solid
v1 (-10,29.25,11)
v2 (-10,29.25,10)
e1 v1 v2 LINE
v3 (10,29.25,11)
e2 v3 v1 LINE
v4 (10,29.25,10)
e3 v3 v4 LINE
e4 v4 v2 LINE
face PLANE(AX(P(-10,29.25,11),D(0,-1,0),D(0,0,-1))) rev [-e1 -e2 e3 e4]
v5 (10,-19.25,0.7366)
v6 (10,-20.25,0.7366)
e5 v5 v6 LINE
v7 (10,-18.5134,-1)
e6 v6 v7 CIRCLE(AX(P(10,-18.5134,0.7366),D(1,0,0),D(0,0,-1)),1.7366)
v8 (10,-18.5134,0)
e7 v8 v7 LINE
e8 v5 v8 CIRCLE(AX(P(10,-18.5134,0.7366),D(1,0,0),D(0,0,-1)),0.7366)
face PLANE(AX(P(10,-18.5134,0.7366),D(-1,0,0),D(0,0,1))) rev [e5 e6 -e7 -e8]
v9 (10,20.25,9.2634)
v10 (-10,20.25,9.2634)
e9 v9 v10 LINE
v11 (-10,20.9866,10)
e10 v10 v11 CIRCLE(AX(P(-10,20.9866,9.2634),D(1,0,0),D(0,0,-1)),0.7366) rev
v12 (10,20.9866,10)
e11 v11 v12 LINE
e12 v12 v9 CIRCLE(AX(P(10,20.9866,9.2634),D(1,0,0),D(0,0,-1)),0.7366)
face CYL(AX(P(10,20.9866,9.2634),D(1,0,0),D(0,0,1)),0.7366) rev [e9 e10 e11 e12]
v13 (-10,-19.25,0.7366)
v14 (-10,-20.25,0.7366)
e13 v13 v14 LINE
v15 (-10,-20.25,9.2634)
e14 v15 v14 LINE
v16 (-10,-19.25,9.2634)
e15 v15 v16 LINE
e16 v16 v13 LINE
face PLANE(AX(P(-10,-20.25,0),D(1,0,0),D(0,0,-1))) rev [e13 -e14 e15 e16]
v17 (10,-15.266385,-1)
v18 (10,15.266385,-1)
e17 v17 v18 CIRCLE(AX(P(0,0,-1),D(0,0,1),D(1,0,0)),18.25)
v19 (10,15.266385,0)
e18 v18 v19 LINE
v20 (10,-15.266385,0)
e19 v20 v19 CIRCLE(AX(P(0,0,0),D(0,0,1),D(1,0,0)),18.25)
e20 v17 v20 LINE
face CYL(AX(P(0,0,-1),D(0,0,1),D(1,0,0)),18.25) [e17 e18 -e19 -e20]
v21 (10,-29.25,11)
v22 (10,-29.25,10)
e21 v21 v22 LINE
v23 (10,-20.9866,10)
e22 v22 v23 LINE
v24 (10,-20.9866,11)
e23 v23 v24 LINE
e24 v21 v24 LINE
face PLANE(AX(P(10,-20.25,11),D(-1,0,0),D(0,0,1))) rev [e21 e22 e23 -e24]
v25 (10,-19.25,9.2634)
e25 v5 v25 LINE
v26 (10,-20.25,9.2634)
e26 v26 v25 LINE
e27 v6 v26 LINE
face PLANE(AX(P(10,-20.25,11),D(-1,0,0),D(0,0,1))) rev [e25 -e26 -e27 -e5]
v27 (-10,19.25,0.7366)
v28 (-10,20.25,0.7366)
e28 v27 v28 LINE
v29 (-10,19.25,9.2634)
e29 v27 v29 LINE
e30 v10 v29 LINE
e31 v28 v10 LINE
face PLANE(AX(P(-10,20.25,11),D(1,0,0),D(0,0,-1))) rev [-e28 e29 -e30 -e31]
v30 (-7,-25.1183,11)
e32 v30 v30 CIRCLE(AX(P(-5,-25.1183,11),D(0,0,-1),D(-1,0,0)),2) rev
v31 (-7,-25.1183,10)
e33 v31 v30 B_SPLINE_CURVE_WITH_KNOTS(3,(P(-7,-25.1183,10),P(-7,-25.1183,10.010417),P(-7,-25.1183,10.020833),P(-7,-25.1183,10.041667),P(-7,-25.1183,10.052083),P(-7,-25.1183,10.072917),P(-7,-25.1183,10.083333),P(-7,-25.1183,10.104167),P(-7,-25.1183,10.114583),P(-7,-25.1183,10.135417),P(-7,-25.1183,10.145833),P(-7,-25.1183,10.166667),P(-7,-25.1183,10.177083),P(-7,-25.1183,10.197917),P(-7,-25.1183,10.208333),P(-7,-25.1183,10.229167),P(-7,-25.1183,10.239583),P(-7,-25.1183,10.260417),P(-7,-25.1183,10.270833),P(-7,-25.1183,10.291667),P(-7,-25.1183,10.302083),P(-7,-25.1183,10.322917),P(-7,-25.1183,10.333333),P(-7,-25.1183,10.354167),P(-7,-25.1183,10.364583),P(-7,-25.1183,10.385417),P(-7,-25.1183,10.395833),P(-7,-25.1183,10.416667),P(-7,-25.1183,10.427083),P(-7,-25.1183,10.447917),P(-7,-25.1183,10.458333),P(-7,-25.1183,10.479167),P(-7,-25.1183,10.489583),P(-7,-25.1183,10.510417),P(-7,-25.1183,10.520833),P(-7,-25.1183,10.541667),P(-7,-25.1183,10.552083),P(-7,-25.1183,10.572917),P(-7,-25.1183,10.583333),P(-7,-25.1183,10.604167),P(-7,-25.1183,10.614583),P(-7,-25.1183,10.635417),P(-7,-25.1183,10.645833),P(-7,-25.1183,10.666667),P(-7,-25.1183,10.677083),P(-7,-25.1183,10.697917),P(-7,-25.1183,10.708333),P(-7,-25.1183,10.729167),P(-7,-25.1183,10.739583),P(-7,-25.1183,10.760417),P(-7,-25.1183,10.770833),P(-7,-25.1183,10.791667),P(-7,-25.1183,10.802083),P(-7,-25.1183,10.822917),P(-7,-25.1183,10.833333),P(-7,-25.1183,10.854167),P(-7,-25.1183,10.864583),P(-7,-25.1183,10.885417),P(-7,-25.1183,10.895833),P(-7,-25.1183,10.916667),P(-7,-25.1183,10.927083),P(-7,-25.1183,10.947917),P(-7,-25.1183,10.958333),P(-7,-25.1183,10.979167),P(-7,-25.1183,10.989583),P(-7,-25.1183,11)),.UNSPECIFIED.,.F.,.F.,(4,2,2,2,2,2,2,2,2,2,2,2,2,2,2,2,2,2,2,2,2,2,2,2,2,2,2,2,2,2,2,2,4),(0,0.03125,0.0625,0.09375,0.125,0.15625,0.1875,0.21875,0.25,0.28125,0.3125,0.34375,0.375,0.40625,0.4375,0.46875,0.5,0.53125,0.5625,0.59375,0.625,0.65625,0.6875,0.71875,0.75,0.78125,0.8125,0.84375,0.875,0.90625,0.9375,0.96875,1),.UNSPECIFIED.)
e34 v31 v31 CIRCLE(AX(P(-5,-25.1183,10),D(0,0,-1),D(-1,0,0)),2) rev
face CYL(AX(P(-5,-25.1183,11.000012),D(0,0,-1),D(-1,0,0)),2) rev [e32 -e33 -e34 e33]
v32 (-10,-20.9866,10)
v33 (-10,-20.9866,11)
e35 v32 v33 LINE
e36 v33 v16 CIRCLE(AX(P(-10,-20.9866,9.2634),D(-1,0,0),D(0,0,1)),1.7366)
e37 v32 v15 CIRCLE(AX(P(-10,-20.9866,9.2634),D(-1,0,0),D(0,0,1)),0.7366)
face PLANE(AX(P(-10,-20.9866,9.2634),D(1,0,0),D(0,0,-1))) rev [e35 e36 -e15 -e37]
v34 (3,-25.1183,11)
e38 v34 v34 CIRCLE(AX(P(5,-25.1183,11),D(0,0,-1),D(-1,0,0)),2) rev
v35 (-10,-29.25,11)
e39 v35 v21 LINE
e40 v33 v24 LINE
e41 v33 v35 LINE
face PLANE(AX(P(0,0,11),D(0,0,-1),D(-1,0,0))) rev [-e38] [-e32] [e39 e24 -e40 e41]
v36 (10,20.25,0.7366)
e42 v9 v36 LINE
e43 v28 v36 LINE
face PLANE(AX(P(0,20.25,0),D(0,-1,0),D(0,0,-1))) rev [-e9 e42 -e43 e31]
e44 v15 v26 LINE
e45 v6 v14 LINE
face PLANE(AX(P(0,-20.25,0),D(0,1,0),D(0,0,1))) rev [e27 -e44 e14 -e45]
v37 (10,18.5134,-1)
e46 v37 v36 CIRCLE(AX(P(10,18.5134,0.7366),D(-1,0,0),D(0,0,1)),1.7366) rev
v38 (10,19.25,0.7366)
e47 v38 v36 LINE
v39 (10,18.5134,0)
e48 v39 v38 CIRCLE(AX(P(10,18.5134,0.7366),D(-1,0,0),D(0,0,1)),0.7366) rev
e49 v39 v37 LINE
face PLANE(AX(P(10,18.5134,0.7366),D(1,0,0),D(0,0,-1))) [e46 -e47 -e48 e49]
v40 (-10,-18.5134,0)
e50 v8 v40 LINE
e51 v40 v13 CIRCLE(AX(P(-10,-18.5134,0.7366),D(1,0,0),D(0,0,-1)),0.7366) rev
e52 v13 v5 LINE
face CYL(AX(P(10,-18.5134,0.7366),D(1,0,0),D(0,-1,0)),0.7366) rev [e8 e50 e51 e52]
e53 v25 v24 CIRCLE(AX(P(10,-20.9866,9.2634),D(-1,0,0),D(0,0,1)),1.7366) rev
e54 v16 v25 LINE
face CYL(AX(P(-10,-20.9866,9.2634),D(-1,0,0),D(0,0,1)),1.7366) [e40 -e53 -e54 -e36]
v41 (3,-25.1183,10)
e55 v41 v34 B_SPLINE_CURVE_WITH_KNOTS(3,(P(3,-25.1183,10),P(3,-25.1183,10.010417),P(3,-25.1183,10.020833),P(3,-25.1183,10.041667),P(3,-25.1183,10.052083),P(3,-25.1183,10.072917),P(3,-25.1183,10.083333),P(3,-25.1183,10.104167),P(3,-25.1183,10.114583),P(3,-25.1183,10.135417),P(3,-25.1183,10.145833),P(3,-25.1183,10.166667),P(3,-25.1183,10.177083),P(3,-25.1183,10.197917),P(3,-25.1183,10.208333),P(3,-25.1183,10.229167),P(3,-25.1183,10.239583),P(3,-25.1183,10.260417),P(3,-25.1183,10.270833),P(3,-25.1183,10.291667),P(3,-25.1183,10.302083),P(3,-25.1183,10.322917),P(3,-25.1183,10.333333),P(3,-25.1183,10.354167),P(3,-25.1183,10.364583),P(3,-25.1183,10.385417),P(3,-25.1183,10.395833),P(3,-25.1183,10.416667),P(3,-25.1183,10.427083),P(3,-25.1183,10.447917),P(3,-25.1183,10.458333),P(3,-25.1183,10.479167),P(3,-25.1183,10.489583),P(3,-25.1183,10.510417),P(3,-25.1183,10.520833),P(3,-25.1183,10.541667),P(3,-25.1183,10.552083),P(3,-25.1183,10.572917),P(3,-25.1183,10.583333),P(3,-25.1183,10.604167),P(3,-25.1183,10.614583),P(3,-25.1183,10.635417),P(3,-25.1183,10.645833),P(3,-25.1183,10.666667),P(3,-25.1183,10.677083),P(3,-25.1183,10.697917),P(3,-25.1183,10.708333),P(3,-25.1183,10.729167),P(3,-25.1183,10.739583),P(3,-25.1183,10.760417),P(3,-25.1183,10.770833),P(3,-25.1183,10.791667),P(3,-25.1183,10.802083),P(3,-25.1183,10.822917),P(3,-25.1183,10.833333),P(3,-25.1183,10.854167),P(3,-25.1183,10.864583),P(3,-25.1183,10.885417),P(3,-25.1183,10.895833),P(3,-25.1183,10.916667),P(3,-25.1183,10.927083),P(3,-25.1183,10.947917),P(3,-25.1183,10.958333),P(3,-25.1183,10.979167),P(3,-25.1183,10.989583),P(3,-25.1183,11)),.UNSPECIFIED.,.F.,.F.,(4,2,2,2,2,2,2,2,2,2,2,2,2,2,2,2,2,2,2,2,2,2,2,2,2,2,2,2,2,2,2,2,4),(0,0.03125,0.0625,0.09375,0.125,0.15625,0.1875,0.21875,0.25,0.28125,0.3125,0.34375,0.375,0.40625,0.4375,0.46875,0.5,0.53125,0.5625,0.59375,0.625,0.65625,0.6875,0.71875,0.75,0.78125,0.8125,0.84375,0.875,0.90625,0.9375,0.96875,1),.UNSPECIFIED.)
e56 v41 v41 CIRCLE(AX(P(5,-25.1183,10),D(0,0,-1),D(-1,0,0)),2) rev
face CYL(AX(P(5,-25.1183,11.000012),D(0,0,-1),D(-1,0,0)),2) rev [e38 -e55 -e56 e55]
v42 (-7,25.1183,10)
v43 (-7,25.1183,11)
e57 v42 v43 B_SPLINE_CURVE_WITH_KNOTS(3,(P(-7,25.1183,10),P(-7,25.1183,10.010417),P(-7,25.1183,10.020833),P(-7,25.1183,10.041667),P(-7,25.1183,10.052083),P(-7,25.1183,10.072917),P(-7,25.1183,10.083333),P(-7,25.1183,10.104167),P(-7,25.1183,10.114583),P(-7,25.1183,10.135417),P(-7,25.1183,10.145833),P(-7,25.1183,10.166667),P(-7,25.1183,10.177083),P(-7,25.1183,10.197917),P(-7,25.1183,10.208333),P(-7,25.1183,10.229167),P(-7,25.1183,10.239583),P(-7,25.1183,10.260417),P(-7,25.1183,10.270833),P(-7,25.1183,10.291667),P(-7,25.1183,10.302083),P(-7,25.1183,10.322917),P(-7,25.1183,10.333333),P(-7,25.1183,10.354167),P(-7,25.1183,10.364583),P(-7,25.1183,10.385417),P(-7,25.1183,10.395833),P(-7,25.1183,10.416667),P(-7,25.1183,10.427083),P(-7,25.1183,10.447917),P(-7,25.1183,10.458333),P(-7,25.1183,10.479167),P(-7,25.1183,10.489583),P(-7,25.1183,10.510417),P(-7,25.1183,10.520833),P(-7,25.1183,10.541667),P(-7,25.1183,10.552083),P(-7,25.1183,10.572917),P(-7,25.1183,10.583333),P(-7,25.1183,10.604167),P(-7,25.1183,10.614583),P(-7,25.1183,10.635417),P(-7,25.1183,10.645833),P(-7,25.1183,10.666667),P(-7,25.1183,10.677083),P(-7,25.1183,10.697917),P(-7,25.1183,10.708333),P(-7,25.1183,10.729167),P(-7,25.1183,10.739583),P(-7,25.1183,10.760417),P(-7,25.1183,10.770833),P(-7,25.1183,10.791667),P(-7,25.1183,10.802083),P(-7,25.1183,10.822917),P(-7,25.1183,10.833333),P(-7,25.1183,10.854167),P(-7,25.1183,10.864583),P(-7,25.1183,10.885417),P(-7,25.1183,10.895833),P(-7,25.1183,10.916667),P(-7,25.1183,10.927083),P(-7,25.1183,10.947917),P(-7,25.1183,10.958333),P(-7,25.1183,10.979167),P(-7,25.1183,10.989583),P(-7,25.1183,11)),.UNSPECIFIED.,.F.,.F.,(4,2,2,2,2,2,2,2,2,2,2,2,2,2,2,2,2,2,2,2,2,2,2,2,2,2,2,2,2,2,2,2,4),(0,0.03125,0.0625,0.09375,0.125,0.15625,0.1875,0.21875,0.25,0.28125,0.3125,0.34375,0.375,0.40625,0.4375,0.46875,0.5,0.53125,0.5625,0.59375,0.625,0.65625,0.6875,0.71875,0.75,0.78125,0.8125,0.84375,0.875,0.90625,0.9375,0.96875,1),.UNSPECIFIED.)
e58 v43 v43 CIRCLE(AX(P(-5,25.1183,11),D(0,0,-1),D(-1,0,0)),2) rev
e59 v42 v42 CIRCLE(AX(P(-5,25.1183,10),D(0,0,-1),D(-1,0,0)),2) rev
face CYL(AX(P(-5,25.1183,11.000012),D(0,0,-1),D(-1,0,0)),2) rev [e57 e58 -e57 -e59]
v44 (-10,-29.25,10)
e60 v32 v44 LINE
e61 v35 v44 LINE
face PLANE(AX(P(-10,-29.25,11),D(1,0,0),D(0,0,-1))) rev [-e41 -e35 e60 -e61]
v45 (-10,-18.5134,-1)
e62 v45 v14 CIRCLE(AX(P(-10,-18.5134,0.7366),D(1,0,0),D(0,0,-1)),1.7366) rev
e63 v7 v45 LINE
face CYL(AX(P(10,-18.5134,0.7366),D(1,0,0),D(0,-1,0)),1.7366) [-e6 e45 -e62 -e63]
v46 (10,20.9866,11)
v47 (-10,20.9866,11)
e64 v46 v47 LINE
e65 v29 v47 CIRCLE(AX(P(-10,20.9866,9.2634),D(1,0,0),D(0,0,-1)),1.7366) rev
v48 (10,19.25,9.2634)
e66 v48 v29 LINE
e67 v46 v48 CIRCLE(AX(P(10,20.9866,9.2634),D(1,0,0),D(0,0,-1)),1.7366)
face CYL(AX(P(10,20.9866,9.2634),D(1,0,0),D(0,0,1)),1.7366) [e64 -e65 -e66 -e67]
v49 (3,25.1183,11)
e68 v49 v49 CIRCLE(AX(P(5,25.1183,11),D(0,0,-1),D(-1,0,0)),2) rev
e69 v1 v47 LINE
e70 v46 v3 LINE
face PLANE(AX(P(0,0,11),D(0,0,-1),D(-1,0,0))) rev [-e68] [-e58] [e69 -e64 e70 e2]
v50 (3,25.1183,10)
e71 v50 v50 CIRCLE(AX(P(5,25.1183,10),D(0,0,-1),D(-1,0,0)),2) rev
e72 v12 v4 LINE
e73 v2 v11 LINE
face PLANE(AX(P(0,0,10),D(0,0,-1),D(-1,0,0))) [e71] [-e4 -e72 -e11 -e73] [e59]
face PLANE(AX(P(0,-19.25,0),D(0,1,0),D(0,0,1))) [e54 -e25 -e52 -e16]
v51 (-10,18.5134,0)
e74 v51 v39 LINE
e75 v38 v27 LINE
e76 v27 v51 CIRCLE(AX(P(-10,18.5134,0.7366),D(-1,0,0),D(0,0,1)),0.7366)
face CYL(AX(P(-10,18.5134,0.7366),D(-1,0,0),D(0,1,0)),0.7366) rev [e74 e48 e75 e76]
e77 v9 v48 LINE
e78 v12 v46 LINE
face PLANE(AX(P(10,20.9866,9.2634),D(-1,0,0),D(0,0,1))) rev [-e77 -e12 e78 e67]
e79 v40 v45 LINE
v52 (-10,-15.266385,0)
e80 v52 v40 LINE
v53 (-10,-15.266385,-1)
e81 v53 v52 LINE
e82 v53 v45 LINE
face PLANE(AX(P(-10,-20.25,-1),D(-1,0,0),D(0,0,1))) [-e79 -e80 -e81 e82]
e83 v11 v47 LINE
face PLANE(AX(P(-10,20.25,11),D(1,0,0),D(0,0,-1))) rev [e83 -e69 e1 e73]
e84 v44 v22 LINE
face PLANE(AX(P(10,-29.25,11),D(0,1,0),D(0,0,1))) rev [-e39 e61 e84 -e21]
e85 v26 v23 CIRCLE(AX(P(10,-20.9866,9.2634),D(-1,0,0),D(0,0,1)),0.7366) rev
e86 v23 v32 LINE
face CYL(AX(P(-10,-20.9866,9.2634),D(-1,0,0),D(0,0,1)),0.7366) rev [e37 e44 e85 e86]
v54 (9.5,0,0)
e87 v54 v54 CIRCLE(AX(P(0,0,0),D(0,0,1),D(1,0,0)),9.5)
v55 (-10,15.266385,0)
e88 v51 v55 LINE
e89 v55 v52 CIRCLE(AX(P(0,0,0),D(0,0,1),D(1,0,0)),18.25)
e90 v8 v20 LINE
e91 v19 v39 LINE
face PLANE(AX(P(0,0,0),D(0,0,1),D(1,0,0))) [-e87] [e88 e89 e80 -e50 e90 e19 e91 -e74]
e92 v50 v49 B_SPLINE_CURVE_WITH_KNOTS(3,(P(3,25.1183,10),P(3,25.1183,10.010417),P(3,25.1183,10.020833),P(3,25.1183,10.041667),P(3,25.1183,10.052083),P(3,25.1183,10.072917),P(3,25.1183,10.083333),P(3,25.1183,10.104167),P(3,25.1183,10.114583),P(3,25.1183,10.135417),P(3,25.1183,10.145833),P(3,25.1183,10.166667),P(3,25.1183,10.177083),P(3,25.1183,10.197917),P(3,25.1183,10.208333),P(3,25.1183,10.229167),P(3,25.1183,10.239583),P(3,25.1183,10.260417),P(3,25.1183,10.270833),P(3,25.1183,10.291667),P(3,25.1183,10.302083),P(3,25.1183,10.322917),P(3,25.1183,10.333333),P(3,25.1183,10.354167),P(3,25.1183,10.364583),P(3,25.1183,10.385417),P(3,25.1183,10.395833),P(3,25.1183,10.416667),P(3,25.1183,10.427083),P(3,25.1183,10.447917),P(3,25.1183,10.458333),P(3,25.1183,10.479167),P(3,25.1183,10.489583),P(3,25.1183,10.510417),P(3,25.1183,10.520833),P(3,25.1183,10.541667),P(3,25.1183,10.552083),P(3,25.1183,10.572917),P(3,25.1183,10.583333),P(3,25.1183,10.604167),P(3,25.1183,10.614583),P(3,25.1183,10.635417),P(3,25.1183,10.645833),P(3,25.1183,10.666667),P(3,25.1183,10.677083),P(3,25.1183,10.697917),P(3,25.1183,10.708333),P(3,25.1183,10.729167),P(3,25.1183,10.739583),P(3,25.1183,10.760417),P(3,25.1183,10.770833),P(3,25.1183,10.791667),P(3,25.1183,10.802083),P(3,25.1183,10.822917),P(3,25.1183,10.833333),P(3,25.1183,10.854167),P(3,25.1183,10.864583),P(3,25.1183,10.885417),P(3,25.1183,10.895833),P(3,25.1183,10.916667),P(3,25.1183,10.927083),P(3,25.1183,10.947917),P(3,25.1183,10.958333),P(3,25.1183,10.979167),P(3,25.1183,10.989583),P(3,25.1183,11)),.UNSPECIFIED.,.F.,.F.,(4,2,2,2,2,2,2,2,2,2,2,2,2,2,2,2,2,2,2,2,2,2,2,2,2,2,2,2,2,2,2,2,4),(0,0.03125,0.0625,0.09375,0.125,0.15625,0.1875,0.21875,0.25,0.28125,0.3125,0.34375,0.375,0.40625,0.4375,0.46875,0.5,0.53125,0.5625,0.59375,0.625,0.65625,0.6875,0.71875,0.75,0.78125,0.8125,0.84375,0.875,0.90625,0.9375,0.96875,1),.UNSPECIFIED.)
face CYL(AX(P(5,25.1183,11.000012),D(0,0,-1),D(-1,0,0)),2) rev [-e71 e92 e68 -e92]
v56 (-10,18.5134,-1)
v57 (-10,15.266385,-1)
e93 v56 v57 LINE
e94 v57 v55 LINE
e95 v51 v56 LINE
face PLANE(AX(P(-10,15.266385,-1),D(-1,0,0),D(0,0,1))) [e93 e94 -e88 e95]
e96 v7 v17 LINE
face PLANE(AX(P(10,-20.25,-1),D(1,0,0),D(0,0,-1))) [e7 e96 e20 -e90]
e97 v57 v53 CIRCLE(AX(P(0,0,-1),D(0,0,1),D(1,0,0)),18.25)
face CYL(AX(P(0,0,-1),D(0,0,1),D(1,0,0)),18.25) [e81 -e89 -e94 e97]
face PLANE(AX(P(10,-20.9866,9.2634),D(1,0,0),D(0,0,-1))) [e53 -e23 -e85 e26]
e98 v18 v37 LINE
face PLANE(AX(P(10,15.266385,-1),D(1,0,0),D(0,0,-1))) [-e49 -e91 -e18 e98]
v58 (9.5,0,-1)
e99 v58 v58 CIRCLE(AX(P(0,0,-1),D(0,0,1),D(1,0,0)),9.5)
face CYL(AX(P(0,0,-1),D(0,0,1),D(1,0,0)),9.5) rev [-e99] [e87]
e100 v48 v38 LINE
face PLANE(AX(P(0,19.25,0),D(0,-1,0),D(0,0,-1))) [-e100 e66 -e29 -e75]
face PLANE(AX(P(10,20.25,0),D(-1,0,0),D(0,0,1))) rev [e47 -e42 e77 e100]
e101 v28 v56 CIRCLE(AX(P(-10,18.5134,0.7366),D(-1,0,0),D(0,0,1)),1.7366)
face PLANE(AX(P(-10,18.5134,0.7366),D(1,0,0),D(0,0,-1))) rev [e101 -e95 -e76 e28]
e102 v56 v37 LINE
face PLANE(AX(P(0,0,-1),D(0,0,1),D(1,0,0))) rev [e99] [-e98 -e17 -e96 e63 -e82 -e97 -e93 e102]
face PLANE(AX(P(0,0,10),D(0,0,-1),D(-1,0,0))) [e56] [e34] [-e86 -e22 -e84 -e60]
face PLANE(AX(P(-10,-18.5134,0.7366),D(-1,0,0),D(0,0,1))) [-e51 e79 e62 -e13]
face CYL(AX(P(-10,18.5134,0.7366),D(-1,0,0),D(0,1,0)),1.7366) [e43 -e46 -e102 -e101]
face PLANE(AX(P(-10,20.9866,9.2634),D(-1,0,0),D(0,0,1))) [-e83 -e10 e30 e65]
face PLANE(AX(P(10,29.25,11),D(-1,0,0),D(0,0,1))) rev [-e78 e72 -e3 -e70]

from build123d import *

# Parameters (mm, degrees)
SKETCH_1_R                       = 9.5
SM_BASE_FLANGE_1_DEPTH           = 1
SM_EDGE_FLANGE_1_STRIP_W         = 5.4732
SM_EDGE_FLANGE_1_STRIP_H         = 1
SM_EDGE_FLANGE_1_STRIP_CUT_DEPTH = 20
SM_EDGE_FLANGE_1_DEPTH           = 20
SM_EDGE_FLANGE_2_STRIP_W         = 5.4732
SM_EDGE_FLANGE_2_STRIP_H         = 1
SM_EDGE_FLANGE_2_STRIP_CUT_DEPTH = 20
SM_EDGE_FLANGE_2_DEPTH           = 20
SM_EDGE_FLANGE_3_STRIP_W         = 5.4732
SM_EDGE_FLANGE_3_STRIP_H         = 1
SM_EDGE_FLANGE_3_STRIP_CUT_DEPTH = 20
SM_EDGE_FLANGE_3_DEPTH           = 20
SM_EDGE_FLANGE_4_STRIP_W         = 5.4732
SM_EDGE_FLANGE_4_STRIP_H         = 1
SM_EDGE_FLANGE_4_STRIP_CUT_DEPTH = 20
SM_EDGE_FLANGE_4_DEPTH           = 20
CUT_EXTRUDE_2_DEPTH              = 37.505136625
CUT_EXTRUDE_2_DEPTH_BACK         = 37.505136625
SKETCH_19_R                      = 2


# Sheet-metal steps are written as plain solids
with BuildPart() as part:
    # Sketch 1 → Базовая кромка1 (new body)
    with BuildSketch(Plane.XY):
        with BuildLine():
            Line((-10, 15.266384641), (-10, 20.25))
            Line((-10, 20.25), (10, 20.25))
            Line((10, 20.25), (10, 15.266384641))
            ThreePointArc((10, 15.266384641), (18.25, 0), (10, -15.266384641))
            Line((10, -15.266384641), (10, -20.25))
            Line((10, -20.25), (-10, -20.25))
            Line((-10, -20.25), (-10, -15.266384641))
            ThreePointArc((-10, -15.266384641), (-18.25, 0), (-10, 15.266384641))
        make_face()
        Circle(SKETCH_1_R, mode=Mode.SUBTRACT)
    extrude(amount=-SM_BASE_FLANGE_1_DEPTH)

    # Ребро-кромка1 strip (across the edge) → Ребро-кромка1 strip cut (cut)
    with BuildSketch(Plane(origin=(10, 20.25, 0), x_dir=(0, -1, 0), z_dir=(-1, 0, 0))):
        with Locations((-1, -0.5)):
            Rectangle(SM_EDGE_FLANGE_1_STRIP_W, SM_EDGE_FLANGE_1_STRIP_H)
    extrude(amount=SM_EDGE_FLANGE_1_STRIP_CUT_DEPTH, mode=Mode.SUBTRACT)

    # Ребро-кромка1 section (across the edge) → Ребро-кромка1 (add)
    with BuildSketch(Plane(origin=(10, 20.25, 0), x_dir=(0, -1, 0), z_dir=(-1, 0, 0))):
        with BuildLine():
            Line((0, 0.7366), (0, 11))
            Line((0, 11), (1, 11))
            Line((1, 11), (1, 0.7366))
            ThreePointArc((1, 0.7366), (1.215745145, 0.215745145), (1.7366, 0))
            Line((1.7366, 0), (1.7366, -1))
            ThreePointArc((1.7366, -1), (0.508638364, -0.491361636), (0, 0.7366))
        make_face()
    extrude(amount=SM_EDGE_FLANGE_1_DEPTH)

    # Ребро-кромка2 strip (across the edge) → Ребро-кромка2 strip cut (cut)
    with BuildSketch(Plane(origin=(-10, -20.25, 0), x_dir=(0, 1, 0), z_dir=(1, 0, 0))):
        with Locations((-1, -0.5)):
            Rectangle(SM_EDGE_FLANGE_2_STRIP_W, SM_EDGE_FLANGE_2_STRIP_H)
    extrude(amount=SM_EDGE_FLANGE_2_STRIP_CUT_DEPTH, mode=Mode.SUBTRACT)

    # Ребро-кромка2 section (across the edge) → Ребро-кромка2 (add)
    with BuildSketch(Plane(origin=(-10, -20.25, 0), x_dir=(0, 1, 0), z_dir=(1, 0, 0))):
        with BuildLine():
            Line((0, 0.7366), (0, 11))
            Line((0, 11), (1, 11))
            Line((1, 11), (1, 0.7366))
            ThreePointArc((1, 0.7366), (1.215745145, 0.215745145), (1.7366, 0))
            Line((1.7366, 0), (1.7366, -1))
            ThreePointArc((1.7366, -1), (0.508638364, -0.491361636), (0, 0.7366))
        make_face()
    extrude(amount=SM_EDGE_FLANGE_2_DEPTH)

    # Ребро-кромка3 strip (across the edge) → Ребро-кромка3 strip cut (cut)
    with BuildSketch(Plane(origin=(-10, 20.25, 11), x_dir=(0, 0, -1), z_dir=(1, 0, 0))):
        with Locations((-1, -0.5)):
            Rectangle(SM_EDGE_FLANGE_3_STRIP_W, SM_EDGE_FLANGE_3_STRIP_H)
    extrude(amount=SM_EDGE_FLANGE_3_STRIP_CUT_DEPTH, mode=Mode.SUBTRACT)

    # Ребро-кромка3 section (across the edge) → Ребро-кромка3 (add)
    with BuildSketch(Plane(origin=(-10, 20.25, 11), x_dir=(0, 0, -1), z_dir=(1, 0, 0))):
        with BuildLine():
            Line((0, 0.7366), (0, 9))
            Line((0, 9), (1, 9))
            Line((1, 9), (1, 0.7366))
            ThreePointArc((1, 0.7366), (1.215745145, 0.215745145), (1.7366, 0))
            Line((1.7366, 0), (1.7366, -1))
            ThreePointArc((1.7366, -1), (0.508638364, -0.491361636), (0, 0.7366))
        make_face()
    extrude(amount=SM_EDGE_FLANGE_3_DEPTH)

    # Ребро-кромка4 strip (across the edge) → Ребро-кромка4 strip cut (cut)
    with BuildSketch(Plane(origin=(10, -20.25, 11), x_dir=(0, 0, -1), z_dir=(-1, 0, 0))):
        with Locations((-1, -0.5)):
            Rectangle(SM_EDGE_FLANGE_4_STRIP_W, SM_EDGE_FLANGE_4_STRIP_H)
    extrude(amount=SM_EDGE_FLANGE_4_STRIP_CUT_DEPTH, mode=Mode.SUBTRACT)

    # Ребро-кромка4 section (across the edge) → Ребро-кромка4 (add)
    with BuildSketch(Plane(origin=(10, -20.25, 11), x_dir=(0, 0, -1), z_dir=(-1, 0, 0))):
        with BuildLine():
            Line((0, 0.7366), (0, 9))
            Line((0, 9), (1, 9))
            Line((1, 9), (1, 0.7366))
            ThreePointArc((1, 0.7366), (1.215745145, 0.215745145), (1.7366, 0))
            Line((1.7366, 0), (1.7366, -1))
            ThreePointArc((1.7366, -1), (0.508638364, -0.491361636), (0, 0.7366))
        make_face()
    extrude(amount=SM_EDGE_FLANGE_4_DEPTH)

    # Эскиз19 → Вырез-Вытянуть2 (cut, two sides: drawn at the far end of the back side and taken through both)
    with BuildSketch(Plane.XY.offset(11).offset(-CUT_EXTRUDE_2_DEPTH_BACK)):
        with Locations(Location((-5, 25.1183, 0), (0, 0, 180))):
            Circle(SKETCH_19_R)
        with Locations(Location((5, 25.1183, 0), (0, 0, 180))):
            Circle(SKETCH_19_R)
        with Locations(Location((5, -25.1183, 0), (0, 0, 180))):
            Circle(SKETCH_19_R)
        with Locations(Location((-5, -25.1183, 0), (0, 0, 180))):
            Circle(SKETCH_19_R)
    extrude(amount=CUT_EXTRUDE_2_DEPTH + CUT_EXTRUDE_2_DEPTH_BACK, mode=Mode.SUBTRACT)


solid = part.part
